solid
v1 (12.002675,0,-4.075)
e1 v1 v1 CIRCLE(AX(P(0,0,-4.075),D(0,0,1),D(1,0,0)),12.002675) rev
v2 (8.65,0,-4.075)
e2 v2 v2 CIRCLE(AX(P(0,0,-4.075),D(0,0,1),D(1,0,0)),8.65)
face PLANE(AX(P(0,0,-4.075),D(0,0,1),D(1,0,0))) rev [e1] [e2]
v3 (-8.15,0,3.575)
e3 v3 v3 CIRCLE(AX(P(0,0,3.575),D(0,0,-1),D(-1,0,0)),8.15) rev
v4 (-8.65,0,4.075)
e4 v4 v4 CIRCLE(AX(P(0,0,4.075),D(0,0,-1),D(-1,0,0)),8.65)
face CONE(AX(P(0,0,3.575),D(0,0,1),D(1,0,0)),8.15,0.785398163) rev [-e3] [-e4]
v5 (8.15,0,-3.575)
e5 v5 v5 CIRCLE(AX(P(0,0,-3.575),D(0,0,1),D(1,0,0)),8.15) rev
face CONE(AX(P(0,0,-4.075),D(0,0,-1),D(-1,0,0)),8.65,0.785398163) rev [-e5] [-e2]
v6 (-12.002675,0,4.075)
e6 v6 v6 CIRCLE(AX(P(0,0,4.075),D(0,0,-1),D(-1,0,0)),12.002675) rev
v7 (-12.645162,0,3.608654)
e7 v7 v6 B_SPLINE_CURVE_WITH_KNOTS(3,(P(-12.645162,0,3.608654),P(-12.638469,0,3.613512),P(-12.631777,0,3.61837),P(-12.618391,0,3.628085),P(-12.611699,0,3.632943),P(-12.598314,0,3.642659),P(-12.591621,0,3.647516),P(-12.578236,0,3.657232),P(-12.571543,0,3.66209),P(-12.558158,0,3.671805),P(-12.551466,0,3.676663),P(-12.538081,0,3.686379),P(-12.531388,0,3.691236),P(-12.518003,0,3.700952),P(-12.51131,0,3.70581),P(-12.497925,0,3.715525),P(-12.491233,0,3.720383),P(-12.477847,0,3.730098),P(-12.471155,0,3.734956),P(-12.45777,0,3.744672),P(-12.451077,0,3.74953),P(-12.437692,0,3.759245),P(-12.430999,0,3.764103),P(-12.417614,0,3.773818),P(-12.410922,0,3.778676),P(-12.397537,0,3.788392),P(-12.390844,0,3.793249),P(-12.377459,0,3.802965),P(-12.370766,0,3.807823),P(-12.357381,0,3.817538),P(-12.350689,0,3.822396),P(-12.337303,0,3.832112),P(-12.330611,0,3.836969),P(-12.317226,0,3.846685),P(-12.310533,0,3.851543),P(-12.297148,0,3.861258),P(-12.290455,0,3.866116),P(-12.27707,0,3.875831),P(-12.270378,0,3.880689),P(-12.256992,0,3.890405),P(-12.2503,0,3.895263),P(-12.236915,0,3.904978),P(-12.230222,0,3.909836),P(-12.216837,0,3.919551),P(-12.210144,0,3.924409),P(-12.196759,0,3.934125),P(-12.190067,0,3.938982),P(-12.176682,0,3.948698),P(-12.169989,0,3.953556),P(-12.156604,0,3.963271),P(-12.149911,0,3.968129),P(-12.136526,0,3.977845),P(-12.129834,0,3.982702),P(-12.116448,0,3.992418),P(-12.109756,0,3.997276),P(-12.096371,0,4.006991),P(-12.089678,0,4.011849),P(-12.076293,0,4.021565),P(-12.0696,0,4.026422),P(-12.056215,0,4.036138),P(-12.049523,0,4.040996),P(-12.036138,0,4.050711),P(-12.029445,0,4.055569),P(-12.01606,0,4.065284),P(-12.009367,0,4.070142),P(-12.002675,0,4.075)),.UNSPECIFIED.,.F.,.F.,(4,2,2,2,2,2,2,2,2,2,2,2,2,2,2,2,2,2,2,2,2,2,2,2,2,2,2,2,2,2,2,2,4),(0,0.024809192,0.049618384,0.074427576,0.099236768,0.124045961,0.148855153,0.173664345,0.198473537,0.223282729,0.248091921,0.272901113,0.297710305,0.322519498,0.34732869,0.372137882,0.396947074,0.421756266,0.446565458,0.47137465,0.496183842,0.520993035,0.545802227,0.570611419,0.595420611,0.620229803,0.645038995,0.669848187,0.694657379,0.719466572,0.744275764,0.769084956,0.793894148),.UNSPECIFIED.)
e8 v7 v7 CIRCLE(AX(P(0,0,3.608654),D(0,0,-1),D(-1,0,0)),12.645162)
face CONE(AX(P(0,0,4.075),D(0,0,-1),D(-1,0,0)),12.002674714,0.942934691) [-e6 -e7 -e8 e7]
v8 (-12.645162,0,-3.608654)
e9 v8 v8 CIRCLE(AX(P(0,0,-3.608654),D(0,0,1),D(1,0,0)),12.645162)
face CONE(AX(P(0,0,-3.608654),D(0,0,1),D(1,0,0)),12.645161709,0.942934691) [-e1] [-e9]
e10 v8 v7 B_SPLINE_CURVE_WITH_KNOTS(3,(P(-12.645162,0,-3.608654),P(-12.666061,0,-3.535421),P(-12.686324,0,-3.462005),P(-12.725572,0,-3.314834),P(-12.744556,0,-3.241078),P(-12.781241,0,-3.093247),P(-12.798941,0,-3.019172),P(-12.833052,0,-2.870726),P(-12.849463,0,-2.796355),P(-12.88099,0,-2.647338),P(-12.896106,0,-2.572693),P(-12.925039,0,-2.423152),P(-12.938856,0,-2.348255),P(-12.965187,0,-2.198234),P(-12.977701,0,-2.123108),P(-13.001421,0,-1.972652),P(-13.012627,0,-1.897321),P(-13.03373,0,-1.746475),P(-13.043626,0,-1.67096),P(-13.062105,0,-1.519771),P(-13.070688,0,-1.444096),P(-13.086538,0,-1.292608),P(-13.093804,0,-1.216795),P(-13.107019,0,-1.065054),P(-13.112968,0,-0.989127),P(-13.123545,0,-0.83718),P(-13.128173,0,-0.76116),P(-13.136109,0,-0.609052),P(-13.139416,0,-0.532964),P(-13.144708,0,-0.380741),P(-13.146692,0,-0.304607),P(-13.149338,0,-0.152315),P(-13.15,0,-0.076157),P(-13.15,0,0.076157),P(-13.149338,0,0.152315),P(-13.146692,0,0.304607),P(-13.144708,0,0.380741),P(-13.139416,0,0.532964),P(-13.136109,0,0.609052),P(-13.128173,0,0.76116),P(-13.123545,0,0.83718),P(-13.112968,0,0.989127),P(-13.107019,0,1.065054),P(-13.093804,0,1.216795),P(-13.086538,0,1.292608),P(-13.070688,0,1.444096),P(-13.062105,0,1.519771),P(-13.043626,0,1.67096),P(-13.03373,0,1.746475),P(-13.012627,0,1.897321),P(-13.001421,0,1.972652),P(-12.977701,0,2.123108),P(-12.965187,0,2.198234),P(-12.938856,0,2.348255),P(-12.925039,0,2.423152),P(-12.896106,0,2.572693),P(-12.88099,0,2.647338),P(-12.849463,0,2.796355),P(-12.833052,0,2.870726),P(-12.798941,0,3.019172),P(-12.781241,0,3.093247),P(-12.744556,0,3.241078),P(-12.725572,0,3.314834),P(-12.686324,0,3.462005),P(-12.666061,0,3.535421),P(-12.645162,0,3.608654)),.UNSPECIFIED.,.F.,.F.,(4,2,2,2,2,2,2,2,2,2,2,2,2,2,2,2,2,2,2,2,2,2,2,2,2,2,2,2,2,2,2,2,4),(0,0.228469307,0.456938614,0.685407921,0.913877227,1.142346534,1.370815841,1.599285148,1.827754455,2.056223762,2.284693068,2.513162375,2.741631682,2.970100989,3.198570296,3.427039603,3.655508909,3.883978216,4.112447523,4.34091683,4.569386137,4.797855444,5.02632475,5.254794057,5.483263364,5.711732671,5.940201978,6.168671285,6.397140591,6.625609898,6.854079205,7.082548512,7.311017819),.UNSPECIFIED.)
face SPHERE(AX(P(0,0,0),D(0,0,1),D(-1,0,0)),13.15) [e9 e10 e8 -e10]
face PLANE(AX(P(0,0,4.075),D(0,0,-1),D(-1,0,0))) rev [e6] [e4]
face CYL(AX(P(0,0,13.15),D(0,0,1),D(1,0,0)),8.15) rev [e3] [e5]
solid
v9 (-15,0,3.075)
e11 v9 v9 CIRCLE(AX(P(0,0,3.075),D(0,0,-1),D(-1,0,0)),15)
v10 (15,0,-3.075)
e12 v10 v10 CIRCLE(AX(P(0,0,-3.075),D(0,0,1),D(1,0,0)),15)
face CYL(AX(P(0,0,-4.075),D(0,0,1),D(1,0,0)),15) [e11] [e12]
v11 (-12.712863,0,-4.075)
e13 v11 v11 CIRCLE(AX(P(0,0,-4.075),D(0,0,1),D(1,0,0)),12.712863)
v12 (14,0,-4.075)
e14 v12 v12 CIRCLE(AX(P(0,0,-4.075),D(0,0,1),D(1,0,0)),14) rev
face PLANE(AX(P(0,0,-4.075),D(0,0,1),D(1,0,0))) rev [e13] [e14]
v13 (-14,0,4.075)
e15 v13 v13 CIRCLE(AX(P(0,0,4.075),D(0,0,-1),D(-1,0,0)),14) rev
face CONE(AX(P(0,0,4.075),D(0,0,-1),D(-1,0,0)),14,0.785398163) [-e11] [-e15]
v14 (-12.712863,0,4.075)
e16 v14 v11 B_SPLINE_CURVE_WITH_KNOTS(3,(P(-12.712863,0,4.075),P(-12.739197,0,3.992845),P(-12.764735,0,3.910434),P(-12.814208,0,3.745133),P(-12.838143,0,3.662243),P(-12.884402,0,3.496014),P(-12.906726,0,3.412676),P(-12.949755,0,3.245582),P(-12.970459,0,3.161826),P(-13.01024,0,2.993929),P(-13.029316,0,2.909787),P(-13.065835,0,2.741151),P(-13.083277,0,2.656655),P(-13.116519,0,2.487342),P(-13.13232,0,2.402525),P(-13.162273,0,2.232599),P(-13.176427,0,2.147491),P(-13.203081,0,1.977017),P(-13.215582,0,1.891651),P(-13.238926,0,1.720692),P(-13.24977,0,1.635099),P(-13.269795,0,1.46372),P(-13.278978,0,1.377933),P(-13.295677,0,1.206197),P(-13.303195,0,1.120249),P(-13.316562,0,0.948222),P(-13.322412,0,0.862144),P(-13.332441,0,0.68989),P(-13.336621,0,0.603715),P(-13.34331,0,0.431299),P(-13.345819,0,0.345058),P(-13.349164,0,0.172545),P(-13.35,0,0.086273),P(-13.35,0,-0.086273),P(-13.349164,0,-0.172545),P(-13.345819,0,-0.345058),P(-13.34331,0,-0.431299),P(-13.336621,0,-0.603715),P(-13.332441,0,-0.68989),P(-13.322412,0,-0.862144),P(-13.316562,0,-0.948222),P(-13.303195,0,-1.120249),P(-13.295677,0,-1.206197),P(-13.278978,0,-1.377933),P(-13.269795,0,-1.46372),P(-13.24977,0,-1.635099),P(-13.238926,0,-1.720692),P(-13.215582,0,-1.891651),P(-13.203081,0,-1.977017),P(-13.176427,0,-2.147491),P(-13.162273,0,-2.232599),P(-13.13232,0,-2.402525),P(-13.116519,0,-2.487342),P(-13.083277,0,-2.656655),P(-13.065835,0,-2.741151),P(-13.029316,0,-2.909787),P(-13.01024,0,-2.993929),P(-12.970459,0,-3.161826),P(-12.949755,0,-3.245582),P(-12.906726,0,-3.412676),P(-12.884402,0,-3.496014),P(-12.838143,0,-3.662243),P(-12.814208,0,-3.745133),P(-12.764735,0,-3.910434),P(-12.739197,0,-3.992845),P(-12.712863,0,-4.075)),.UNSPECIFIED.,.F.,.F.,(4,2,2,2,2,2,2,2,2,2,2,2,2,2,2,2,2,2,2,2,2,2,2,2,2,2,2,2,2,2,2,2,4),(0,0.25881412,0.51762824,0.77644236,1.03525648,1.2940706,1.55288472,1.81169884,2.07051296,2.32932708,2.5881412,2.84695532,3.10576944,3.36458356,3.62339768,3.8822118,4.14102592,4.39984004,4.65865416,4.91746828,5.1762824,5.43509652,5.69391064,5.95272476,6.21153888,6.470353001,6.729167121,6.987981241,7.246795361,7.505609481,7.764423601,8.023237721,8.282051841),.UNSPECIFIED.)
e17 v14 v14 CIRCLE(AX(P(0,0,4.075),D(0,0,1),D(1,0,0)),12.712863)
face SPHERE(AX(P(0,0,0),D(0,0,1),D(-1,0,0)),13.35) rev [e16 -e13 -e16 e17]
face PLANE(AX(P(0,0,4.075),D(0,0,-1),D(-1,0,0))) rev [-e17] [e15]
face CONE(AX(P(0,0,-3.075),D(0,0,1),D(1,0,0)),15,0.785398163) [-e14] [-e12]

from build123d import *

# Parameters (mm, degrees)
CUT_EXTRUDE1_DEPTH      = 24.200228986
CUT_EXTRUDE1_DEPTH_BACK = 24.200228986
SKETCH7_R               = 18.62743981
SKETCH7_R_2             = 15.62743981
CUT_EXTRUDE2_DEPTH      = 23.473081119
CUT_EXTRUDE2_DEPTH_BACK = 23.473081119
SKETCH9_R               = 15.62743981
SKETCH9_R_2             = 15
CHAMFER1_SIZE           = 1
CHAMFER3_SIZE           = 0.5


with BuildPart() as part:
    # Sketch4 → Revolve4 (revolve)
    with BuildSketch(Plane(origin=(0, 0, 0), x_dir=(1, 0, 0), z_dir=(0, 1, 0))):
        with BuildLine():
            Line((-8.15, -4.075), (-8.15, 0))
            Line((-8.15, 0), (-8.15, 4.075))
            Line((-8.15, 4.075), (-12.502674714, 4.075))
            ThreePointArc((-12.502674714, 4.075), (-13.15, 0), (-12.502674714, -4.075))
            Line((-12.502674714, -4.075), (-8.15, -4.075))
        make_face()
    revolve(axis=Axis((0, 0, 13.15), (0, 0, -1)))

    # Chamfer3
    # the kernel refuses this chamfer: 0.5 mm, written as the material it takes off along each edge
    with BuildSketch(Plane(origin=(0, 0, -4.075), x_dir=(-1, 0, 0), z_dir=(0, -1, 0))) as chamfer3_piece_1:
        Polygon((8.15, -CHAMFER3_SIZE), (8.15 + CHAMFER3_SIZE, 0), (8.15, 0), align=None)
    revolve(axis=Axis((0, 0, -4.075), (0, 0, -1)), mode=Mode.SUBTRACT)
    with BuildSketch(Plane(origin=(0, 0, 4.075), x_dir=(-1, 0, 0), z_dir=(0, -1, 0))) as chamfer3_piece_2:
        Polygon((8.15 + CHAMFER3_SIZE, 0), (8.15, CHAMFER3_SIZE), (8.15, 0), align=None)
    revolve(axis=Axis((0, 0, 4.075), (0, 0, -1)), mode=Mode.SUBTRACT)
    with BuildSketch(Plane(origin=(0, 0, 4.075), x_dir=(-1, 0, 0), z_dir=(0, -1, 0))) as chamfer3_piece_3:
        with BuildLine():
            Line((12.502674714 - CHAMFER3_SIZE, 0), (12.645161709, 0.466345772))
            ThreePointArc((12.645161709, 0.466345772), (12.578409578, 0.240145049), (12.502674714, 0))
            Line((12.502674714, 0), (12.502674714 - CHAMFER3_SIZE, 0))
        make_face()
    revolve(axis=Axis((0, 0, 4.075), (0, 0, -1)), mode=Mode.SUBTRACT)
    with BuildSketch(Plane(origin=(0, 0, -4.075), x_dir=(-1, 0, 0), z_dir=(0, -1, 0))) as chamfer3_piece_4:
        with BuildLine():
            Line((12.502674714 - CHAMFER3_SIZE, 0), (12.645161709, -0.466345772))
            ThreePointArc((12.645161709, -0.466345772), (12.578409578, -0.240145049), (12.502674714, 0))
            Line((12.502674714, 0), (12.502674714 - CHAMFER3_SIZE, 0))
        make_face()
    revolve(axis=Axis((0, 0, -4.075), (0, 0, -1)), mode=Mode.SUBTRACT)


with BuildPart() as body_2:
    # Sketch6 → Revolve5 (revolve)
    with BuildSketch(Plane(origin=(0, 0, 0), x_dir=(1, 0, 0), z_dir=(0, 1, 0))):
        with BuildLine():
            ThreePointArc((-12.712862581, -4.075), (-13.35, 0), (-12.712862581, 4.075))
            Line((-12.712862581, 4.075), (-15.62743981, 4.075))
            ThreePointArc((-15.62743981, 4.075), (-16.15, 0), (-15.62743981, -4.075))
            Line((-15.62743981, -4.075), (-12.712862581, -4.075))
        make_face()
        with BuildLine():
            Line((15.62743981, 4.075), (12.712862581, 4.075))
            ThreePointArc((12.712862581, 4.075), (13.189753892, 2.062254173), (13.35, 0))
            ThreePointArc((13.35, 0), (13.189753892, -2.062254173), (12.712862581, -4.075))
            Line((12.712862581, -4.075), (15.62743981, -4.075))
            ThreePointArc((15.62743981, -4.075), (16.01882725, -2.054184397), (16.15, 0))
            ThreePointArc((16.15, 0), (16.01882725, 2.054184397), (15.62743981, 4.075))
        make_face()
    revolve(axis=Axis((0, 0, 13.15), (0, 0, -1)))

    # Sketch7 → Cut-Extrude1 (cut, two sides: drawn at the far end of the back side and taken through both)
    with BuildSketch(Plane.XY.offset(-CUT_EXTRUDE1_DEPTH_BACK)):
        Circle(SKETCH7_R)
        Circle(SKETCH7_R_2, mode=Mode.SUBTRACT)
    extrude(amount=CUT_EXTRUDE1_DEPTH + CUT_EXTRUDE1_DEPTH_BACK, mode=Mode.SUBTRACT)

    # Sketch9 → Cut-Extrude2 (cut, two sides: drawn at the far end of the back side and taken through both)
    with BuildSketch(Plane.XY.offset(-CUT_EXTRUDE2_DEPTH_BACK)):
        Circle(SKETCH9_R)
        Circle(SKETCH9_R_2, mode=Mode.SUBTRACT)
    extrude(amount=CUT_EXTRUDE2_DEPTH + CUT_EXTRUDE2_DEPTH_BACK, mode=Mode.SUBTRACT)

    # Chamfer1
    chamfer1_edges = [body_2.edges().sort_by_distance(p)[0] for p in [
        (-15, 0, -4.075),
        (-15, 0, 4.075),
    ]]
    chamfer(chamfer1_edges, length=CHAMFER1_SIZE)


solid = Compound([part.part, body_2.part])
